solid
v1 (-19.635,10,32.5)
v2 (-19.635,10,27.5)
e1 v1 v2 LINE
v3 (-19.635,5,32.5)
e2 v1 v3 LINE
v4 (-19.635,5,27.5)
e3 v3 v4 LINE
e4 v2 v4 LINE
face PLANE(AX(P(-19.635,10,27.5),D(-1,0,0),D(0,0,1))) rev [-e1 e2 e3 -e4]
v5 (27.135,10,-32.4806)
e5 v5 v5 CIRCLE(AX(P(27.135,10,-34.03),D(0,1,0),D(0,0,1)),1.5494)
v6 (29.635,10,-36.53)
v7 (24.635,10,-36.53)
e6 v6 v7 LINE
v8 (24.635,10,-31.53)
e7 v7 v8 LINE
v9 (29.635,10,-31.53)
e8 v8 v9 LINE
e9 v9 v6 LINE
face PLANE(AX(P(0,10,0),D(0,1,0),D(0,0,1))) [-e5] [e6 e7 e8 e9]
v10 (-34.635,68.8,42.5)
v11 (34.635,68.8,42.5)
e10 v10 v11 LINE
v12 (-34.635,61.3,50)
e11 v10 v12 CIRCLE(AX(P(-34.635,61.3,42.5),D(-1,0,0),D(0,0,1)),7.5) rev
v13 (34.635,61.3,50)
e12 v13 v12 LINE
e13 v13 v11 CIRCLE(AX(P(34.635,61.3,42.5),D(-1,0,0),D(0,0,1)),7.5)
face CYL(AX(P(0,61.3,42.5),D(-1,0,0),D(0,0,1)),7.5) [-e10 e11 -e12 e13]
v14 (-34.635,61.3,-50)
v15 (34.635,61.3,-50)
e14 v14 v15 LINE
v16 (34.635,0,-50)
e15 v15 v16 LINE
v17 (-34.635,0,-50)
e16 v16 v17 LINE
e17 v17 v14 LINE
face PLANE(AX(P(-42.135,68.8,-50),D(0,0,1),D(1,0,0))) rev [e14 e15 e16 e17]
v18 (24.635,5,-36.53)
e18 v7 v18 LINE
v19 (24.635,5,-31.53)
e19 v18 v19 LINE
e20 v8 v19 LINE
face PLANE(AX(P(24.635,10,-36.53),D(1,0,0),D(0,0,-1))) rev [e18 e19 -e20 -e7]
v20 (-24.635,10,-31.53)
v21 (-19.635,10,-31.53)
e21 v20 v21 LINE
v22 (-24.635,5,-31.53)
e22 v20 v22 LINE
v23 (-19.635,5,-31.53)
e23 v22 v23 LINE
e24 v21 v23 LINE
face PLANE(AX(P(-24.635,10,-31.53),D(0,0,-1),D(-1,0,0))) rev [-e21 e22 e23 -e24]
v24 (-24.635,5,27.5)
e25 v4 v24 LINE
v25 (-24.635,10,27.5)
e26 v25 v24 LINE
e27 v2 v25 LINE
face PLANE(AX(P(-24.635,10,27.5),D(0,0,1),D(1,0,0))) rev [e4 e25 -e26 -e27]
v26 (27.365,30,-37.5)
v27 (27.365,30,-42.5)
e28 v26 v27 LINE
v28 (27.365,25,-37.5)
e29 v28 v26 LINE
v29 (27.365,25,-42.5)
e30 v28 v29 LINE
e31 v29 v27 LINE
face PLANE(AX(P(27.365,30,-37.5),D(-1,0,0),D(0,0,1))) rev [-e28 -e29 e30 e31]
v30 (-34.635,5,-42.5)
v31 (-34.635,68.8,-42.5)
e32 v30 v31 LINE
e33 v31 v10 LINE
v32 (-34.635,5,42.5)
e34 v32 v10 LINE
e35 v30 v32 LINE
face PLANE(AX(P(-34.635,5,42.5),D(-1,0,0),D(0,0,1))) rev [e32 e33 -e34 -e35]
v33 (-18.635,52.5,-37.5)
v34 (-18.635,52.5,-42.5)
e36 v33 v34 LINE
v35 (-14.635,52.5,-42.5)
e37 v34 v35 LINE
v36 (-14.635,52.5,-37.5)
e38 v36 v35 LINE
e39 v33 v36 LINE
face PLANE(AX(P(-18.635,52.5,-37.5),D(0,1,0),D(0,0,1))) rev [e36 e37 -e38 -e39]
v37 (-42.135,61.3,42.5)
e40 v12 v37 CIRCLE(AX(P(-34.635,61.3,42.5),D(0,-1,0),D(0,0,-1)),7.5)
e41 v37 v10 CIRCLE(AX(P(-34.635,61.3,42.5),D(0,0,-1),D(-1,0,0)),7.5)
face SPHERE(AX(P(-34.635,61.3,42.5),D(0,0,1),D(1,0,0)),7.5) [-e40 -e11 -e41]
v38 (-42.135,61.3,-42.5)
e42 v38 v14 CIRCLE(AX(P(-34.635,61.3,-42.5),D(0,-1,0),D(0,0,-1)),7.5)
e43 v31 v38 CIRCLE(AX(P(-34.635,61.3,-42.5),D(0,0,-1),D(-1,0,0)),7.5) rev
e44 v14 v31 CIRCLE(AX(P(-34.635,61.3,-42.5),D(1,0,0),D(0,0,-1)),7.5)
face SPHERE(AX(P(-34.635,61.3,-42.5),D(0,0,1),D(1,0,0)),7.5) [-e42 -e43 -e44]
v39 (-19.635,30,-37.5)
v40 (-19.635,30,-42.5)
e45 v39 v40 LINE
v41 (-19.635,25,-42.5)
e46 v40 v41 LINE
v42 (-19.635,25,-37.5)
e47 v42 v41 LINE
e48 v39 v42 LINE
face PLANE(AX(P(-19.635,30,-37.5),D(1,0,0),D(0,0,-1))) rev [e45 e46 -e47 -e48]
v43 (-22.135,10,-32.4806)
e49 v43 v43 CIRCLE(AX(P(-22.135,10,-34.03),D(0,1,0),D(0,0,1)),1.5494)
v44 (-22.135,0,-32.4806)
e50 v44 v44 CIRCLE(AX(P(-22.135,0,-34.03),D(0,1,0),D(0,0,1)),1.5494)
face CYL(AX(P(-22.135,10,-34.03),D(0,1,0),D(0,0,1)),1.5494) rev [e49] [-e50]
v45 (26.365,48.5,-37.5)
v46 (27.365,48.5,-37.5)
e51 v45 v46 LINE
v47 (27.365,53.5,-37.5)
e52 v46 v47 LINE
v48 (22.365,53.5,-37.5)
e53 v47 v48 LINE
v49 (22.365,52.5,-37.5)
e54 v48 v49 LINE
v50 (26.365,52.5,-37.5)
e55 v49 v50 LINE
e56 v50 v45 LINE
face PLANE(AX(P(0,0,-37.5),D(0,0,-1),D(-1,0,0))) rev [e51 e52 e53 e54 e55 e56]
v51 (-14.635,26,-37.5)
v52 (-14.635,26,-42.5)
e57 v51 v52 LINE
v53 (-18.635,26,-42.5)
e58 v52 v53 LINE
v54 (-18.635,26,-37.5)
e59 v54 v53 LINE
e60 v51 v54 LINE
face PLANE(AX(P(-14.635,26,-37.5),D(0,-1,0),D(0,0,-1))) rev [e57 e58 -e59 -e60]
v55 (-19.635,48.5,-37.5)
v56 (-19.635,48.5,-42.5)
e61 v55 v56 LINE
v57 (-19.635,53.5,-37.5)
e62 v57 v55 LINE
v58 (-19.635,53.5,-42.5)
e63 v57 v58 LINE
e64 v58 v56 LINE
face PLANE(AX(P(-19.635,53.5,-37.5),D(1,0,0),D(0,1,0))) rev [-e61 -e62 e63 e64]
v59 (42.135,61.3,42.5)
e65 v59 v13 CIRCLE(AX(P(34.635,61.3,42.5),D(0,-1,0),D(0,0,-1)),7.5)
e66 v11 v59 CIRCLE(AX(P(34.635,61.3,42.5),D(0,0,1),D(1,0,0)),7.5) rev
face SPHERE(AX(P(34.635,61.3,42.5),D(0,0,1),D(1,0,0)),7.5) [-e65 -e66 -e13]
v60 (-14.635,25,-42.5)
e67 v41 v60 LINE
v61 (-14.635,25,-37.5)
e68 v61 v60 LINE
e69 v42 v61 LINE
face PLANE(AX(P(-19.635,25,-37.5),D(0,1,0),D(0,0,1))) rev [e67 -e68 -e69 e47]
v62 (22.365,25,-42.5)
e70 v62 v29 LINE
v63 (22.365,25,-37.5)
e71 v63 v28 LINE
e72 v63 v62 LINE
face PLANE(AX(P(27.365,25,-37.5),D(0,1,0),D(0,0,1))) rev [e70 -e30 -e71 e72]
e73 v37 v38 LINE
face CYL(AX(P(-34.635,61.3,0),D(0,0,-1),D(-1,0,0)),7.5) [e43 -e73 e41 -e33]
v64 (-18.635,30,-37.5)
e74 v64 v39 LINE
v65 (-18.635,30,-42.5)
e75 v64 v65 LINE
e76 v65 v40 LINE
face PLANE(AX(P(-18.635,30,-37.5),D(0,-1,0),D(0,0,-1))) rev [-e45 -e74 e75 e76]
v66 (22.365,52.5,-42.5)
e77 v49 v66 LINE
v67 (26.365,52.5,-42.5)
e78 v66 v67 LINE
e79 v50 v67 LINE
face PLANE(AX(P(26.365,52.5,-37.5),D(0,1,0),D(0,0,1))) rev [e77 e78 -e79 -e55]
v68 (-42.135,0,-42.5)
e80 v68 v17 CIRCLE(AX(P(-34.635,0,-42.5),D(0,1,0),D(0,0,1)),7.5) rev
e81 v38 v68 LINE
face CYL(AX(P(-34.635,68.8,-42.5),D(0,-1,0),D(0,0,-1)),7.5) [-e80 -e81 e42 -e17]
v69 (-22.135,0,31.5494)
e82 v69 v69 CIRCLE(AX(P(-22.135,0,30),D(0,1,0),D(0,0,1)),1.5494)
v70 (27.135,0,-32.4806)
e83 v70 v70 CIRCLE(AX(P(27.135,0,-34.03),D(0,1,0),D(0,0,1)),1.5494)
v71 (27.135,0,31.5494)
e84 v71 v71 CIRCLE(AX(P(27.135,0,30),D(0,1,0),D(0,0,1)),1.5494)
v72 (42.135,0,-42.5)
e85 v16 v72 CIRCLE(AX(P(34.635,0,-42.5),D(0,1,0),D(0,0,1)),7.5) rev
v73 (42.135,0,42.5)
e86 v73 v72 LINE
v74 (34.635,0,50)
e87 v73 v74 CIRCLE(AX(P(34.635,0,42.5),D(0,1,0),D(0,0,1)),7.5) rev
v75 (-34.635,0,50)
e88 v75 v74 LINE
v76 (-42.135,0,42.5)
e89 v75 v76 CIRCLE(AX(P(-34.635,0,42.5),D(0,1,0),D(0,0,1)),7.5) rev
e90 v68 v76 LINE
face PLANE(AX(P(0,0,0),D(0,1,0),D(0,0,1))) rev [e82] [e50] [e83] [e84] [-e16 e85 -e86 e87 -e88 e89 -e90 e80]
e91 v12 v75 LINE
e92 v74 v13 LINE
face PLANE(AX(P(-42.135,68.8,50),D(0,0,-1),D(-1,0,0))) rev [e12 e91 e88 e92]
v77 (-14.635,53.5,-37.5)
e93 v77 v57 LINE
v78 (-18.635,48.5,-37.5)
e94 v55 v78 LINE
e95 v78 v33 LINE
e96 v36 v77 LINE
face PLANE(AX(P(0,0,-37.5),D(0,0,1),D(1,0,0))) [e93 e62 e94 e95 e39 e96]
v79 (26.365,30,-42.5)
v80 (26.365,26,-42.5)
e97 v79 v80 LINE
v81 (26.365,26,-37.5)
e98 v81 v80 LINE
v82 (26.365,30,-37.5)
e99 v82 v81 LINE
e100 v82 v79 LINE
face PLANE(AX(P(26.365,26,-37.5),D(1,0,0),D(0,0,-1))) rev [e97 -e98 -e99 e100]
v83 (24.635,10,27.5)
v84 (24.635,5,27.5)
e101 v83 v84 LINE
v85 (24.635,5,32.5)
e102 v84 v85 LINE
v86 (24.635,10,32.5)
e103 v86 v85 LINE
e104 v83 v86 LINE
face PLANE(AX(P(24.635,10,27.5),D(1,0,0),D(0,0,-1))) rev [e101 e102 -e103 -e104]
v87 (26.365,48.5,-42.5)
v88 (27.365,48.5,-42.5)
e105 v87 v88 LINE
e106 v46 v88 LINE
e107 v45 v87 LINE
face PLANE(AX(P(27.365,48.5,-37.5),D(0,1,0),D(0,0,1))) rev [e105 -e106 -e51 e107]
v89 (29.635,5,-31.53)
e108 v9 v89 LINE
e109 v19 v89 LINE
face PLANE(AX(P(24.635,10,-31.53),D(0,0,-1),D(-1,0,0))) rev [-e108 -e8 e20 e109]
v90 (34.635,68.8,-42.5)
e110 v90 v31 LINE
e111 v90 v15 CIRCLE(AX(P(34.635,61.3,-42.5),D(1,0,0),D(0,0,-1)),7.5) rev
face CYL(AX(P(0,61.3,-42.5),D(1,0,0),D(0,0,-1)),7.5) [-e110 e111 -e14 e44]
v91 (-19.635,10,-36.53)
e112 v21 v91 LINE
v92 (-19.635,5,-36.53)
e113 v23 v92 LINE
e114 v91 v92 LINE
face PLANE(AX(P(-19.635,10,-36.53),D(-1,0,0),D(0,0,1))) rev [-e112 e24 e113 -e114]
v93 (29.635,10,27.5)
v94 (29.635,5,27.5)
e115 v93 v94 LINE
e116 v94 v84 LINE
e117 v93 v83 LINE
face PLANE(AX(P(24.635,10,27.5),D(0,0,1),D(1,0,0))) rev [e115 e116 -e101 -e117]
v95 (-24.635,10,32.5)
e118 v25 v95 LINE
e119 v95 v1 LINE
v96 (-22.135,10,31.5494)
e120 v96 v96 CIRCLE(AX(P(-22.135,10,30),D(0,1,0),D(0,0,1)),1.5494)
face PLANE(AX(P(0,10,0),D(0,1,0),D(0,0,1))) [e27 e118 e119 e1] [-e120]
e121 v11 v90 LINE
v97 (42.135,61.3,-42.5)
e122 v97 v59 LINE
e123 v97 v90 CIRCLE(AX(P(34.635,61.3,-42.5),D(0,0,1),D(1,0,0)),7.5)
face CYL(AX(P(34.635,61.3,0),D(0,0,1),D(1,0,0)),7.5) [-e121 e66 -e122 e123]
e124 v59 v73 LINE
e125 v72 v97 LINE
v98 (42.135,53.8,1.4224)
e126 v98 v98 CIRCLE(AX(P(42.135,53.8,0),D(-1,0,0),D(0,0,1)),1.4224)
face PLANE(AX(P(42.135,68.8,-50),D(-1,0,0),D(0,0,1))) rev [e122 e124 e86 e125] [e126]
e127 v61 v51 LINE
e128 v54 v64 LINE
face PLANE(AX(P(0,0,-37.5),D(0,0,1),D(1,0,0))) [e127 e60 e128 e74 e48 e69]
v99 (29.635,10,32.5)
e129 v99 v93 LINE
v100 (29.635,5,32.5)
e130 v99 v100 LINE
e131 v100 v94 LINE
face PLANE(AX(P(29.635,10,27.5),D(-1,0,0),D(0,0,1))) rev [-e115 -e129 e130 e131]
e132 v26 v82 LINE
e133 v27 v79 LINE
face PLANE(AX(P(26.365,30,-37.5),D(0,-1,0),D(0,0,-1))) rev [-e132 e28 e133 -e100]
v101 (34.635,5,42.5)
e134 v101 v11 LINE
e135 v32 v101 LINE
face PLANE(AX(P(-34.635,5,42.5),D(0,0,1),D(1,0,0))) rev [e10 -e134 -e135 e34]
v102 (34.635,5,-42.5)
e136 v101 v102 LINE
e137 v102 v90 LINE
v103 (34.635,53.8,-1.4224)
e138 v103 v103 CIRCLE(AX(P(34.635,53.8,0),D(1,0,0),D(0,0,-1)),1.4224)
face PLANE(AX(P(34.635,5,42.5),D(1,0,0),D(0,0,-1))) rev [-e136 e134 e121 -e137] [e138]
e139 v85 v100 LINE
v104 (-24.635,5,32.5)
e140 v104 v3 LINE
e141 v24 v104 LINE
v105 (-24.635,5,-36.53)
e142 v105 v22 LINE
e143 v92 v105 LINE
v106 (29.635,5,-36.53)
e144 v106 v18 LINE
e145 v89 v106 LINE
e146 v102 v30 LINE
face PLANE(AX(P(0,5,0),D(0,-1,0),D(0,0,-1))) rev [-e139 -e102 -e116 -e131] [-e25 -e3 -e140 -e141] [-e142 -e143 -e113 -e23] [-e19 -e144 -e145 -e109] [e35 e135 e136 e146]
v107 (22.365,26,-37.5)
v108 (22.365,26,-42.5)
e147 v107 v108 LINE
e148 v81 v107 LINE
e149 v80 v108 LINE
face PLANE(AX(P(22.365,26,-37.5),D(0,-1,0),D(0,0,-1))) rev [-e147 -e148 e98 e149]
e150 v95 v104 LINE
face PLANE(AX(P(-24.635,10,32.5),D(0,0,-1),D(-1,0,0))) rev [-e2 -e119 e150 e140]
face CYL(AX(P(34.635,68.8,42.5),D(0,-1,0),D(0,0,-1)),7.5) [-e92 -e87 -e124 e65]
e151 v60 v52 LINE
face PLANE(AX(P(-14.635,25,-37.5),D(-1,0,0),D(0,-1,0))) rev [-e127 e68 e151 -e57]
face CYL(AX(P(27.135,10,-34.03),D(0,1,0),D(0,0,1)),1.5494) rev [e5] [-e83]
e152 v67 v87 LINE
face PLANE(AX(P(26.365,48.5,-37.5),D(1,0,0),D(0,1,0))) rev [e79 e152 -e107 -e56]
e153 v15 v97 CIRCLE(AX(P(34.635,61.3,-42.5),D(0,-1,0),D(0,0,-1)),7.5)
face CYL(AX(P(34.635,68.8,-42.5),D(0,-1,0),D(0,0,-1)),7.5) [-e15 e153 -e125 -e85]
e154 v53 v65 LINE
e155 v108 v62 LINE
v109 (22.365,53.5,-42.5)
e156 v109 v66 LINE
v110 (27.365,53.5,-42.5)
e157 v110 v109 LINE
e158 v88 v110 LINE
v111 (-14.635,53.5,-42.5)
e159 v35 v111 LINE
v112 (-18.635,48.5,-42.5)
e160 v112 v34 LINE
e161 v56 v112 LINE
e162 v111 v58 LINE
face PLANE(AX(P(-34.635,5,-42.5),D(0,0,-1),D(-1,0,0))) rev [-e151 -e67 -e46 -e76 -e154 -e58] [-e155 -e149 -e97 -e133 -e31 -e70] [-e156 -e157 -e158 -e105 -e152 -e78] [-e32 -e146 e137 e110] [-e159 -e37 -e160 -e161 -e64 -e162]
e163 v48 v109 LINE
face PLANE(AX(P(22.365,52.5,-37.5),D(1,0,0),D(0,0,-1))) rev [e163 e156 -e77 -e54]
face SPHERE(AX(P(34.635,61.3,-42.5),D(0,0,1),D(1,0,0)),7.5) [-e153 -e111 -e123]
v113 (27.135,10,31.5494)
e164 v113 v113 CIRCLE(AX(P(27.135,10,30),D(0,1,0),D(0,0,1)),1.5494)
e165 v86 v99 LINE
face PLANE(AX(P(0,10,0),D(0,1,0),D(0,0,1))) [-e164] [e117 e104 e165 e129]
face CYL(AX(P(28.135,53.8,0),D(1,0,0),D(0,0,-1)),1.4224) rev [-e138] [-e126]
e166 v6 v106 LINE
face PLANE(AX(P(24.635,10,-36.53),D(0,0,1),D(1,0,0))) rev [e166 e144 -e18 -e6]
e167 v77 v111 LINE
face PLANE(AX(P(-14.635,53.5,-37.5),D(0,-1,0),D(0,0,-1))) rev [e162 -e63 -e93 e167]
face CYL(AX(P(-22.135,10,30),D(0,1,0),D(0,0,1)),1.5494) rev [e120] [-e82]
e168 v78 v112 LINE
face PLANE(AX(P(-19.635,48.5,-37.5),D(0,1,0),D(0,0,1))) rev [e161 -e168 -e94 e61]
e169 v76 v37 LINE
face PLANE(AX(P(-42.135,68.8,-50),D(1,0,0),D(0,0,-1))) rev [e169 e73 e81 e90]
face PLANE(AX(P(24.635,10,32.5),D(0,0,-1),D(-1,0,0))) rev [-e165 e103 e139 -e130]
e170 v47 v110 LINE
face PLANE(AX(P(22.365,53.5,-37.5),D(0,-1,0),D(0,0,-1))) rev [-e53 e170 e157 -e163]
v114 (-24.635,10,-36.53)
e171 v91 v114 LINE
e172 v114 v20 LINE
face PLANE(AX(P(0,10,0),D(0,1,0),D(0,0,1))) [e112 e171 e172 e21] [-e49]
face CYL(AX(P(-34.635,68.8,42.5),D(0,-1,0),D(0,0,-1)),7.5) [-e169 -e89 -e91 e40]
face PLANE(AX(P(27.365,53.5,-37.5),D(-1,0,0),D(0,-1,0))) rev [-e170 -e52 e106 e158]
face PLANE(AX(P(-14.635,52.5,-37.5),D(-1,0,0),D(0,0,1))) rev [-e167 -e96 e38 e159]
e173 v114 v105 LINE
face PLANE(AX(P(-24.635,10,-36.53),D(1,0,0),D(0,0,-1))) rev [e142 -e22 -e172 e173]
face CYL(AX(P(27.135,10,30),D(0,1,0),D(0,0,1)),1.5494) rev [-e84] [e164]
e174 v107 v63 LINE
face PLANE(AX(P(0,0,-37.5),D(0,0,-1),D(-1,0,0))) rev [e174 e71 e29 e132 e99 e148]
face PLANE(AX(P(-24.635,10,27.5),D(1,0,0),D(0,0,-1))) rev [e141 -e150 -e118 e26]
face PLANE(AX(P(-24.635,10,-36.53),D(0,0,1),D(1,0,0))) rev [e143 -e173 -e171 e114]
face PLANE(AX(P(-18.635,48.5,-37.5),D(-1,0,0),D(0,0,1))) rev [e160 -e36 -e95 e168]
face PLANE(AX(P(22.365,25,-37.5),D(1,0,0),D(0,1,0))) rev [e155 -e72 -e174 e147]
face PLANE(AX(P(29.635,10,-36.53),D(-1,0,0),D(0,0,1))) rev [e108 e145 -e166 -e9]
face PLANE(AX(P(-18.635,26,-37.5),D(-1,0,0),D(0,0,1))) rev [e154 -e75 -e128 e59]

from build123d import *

# Parameters (mm, degrees)
SKETCH1_W               = 84.27
SKETCH1_H               = 100
BOSS_EXTRUDE1_DEPTH     = 68.8
SKETCH2_W               = 69.27
SKETCH2_H               = 85
CUT_EXTRUDE1_DEPTH      = 63.8
SKETCH6_W               = 5
SKETCH6_H               = 5
BOSS_EXTRUDE2_DEPTH     = 5
BOSS_EXTRUDE3_DEPTH     = 5
FILLET1_R               = 7.5
FILLET8_R               = 7.5
ADVANCEDHOLE2_OUTLINE_R = 1.5494
ADVANCEDHOLE2_DEPTH     = 10
HOLE1_START             = 34.635
HOLE1_OUTLINE_R         = 1.4224
HOLE1_DEPTH             = 7.5


# Read off the part's stored shape, not the designer's step: AdvancedHole2, Hole1
# Some blends are built 0.0001 mm under size
with BuildPart() as part:
    # Sketch1 → Boss-Extrude1 (new body)
    with BuildSketch(Plane(origin=(0, 0, 0), x_dir=(1, 0, 0), z_dir=(0, 1, 0))):
        Rectangle(SKETCH1_W, SKETCH1_H)
    extrude(amount=BOSS_EXTRUDE1_DEPTH)

    # Sketch2 → Cut-Extrude1 (cut)
    with BuildSketch(Plane(origin=(0, 68.8, 0), x_dir=(1, 0, 0), z_dir=(0, 1, 0))):
        Rectangle(SKETCH2_W, SKETCH2_H)
    extrude(amount=-CUT_EXTRUDE1_DEPTH, mode=Mode.SUBTRACT)

    # Sketch6 → Boss-Extrude2 (add)
    with BuildSketch(Plane(origin=(0, 5, 0), x_dir=(1, 0, 0), z_dir=(0, 1, 0))):
        with Locations((-22.135, 34.03)):
            Rectangle(SKETCH6_W, SKETCH6_H)
        with Locations((-22.135, -30)):
            Rectangle(SKETCH6_W, SKETCH6_H)
        with Locations((27.135, 34.03)):
            Rectangle(SKETCH6_W, SKETCH6_H)
        with Locations((27.135, -30)):
            Rectangle(SKETCH6_W, SKETCH6_H)
    extrude(amount=BOSS_EXTRUDE2_DEPTH)

    # Sketch7 → Boss-Extrude3 (add)
    with BuildSketch(Plane.XY.offset(-42.5)):
        Polygon((-19.635, 30), (-19.635, 25), (-14.635, 25), (-14.635, 26), (-18.635, 26), (-18.635, 30), align=None)
        Polygon((-19.635, 53.5), (-19.635, 48.5), (-18.635, 48.5), (-18.635, 52.5), (-14.635, 52.5), (-14.635, 53.5), align=None)
        Polygon((22.365, 53.5), (27.365, 53.5), (27.365, 48.5), (26.365, 48.5), (26.365, 52.5), (22.365, 52.5), align=None)
        Polygon((27.365, 30), (27.365, 25), (22.365, 25), (22.365, 26), (26.365, 26), (26.365, 30), align=None)
    extrude(amount=BOSS_EXTRUDE3_DEPTH)

    # Fillet1
    fillet1_edges = [part.edges().sort_by_distance(p)[0] for p in [
        (-42.135, 68.8, 0),
        (0, 68.8, 50),
        (42.135, 68.8, 0),
        (0, 68.8, -50),
    ]]
    fillet(fillet1_edges, radius=FILLET1_R - 0.0001)  # a hair under: the kernel refuses the full size

    # Fillet8
    # the kernel refuses this fillet: 7.5 mm, written as the material it takes off along each edge
    with BuildSketch(Plane(origin=(-34.635, 68.8, 42.5), x_dir=(-1, 0, 0), z_dir=(0, 0, -1))) as fillet8_piece_1:
        with BuildLine():
            CenterArc((0.0001, -7.4999), 7.4999, 0, 90)
            Line((7.5, -7.4999), (7.5, 0))
            Line((7.5, 0), (0.0001, 0))
        make_face()
    revolve(axis=Axis((-34.635, 68.8, 42.5), (0, 1, 0)), revolution_arc=90, mode=Mode.SUBTRACT)
    with BuildSketch(Plane(origin=(-34.635, 68.8, -42.5), x_dir=(0, 0, -1), z_dir=(1, 0, 0))) as fillet8_piece_2:
        with BuildLine():
            CenterArc((0.0001, -7.4999), 7.4999, 0, 90)
            Line((7.5, -7.4999), (7.5, 0))
            Line((7.5, 0), (0.0001, 0))
        make_face()
    revolve(axis=Axis((-34.635, 68.8, -42.5), (0, 1, 0)), revolution_arc=90, mode=Mode.SUBTRACT)
    with BuildSketch(Plane(origin=(34.635, 68.8, 42.5), x_dir=(0, 0, 1), z_dir=(-1, 0, 0))) as fillet8_piece_3:
        with BuildLine():
            CenterArc((0.0001, -7.4999), 7.4999, 0, 90)
            Line((7.5, -7.4999), (7.5, 0))
            Line((7.5, 0), (0.0001, 0))
        make_face()
    revolve(axis=Axis((34.635, 68.8, 42.5), (0, 1, 0)), revolution_arc=90, mode=Mode.SUBTRACT)
    with BuildSketch(Plane(origin=(34.635, 68.8, -42.5), x_dir=(1, 0, 0), z_dir=(0, 0, 1))) as fillet8_piece_4:
        with BuildLine():
            CenterArc((0.0001, -7.4999), 7.4999, 0, 90)
            Line((7.5, -7.4999), (7.5, 0))
            Line((7.5, 0), (0.0001, 0))
        make_face()
    revolve(axis=Axis((34.635, 68.8, -42.5), (0, 1, 0)), revolution_arc=90, mode=Mode.SUBTRACT)
    with BuildSketch(Plane(origin=(42.135, -18.75, -50), x_dir=(-1, 0, 0), z_dir=(0, 1, 0)), Plane(origin=(42.135, -18.75, 50), x_dir=(0, 0, -1), z_dir=(0, 1, 0))) as fillet8_piece_5:
        with BuildLine():
            CenterArc((FILLET8_R, FILLET8_R), FILLET8_R, 180, 90)
            Line((0, FILLET8_R), (0, 0))
            Line((0, 0), (FILLET8_R, 0))
        make_face()
    extrude(amount=87.55, mode=Mode.SUBTRACT)
    with BuildSketch(Plane(origin=(-42.135, -18.75, 50), x_dir=(0, 0, -1), z_dir=(0, 1, 0)), Plane(origin=(-42.135, -18.75, -50), x_dir=(1, 0, 0), z_dir=(0, 1, 0))) as fillet8_piece_6:
        with BuildLine():
            CenterArc((FILLET8_R, -FILLET8_R), FILLET8_R, 90, 90)
            Line((0, -FILLET8_R), (0, 0))
            Line((0, 0), (FILLET8_R, 0))
        make_face()
    extrude(amount=87.55, mode=Mode.SUBTRACT)

    # AdvancedHole2 outline → AdvancedHole2 (cut)
    with BuildSketch(Plane(origin=(0, 0, 0), x_dir=(1, 0, 0), z_dir=(0, 1, 0))):
        with Locations((-22.135, -30)):
            Circle(ADVANCEDHOLE2_OUTLINE_R)
        with Locations((27.135, -30)):
            Circle(ADVANCEDHOLE2_OUTLINE_R)
        with Locations((27.135, 34.03)):
            Circle(ADVANCEDHOLE2_OUTLINE_R)
        with Locations((-22.135, 34.03)):
            Circle(ADVANCEDHOLE2_OUTLINE_R)
    extrude(amount=ADVANCEDHOLE2_DEPTH, mode=Mode.SUBTRACT)

    # Hole1 outline → Hole1 (cut)
    with BuildSketch(Plane.YZ.offset(HOLE1_START)):
        with Locations((53.8, 0)):
            Circle(HOLE1_OUTLINE_R)
    extrude(amount=HOLE1_DEPTH, mode=Mode.SUBTRACT)


solid = part.part
